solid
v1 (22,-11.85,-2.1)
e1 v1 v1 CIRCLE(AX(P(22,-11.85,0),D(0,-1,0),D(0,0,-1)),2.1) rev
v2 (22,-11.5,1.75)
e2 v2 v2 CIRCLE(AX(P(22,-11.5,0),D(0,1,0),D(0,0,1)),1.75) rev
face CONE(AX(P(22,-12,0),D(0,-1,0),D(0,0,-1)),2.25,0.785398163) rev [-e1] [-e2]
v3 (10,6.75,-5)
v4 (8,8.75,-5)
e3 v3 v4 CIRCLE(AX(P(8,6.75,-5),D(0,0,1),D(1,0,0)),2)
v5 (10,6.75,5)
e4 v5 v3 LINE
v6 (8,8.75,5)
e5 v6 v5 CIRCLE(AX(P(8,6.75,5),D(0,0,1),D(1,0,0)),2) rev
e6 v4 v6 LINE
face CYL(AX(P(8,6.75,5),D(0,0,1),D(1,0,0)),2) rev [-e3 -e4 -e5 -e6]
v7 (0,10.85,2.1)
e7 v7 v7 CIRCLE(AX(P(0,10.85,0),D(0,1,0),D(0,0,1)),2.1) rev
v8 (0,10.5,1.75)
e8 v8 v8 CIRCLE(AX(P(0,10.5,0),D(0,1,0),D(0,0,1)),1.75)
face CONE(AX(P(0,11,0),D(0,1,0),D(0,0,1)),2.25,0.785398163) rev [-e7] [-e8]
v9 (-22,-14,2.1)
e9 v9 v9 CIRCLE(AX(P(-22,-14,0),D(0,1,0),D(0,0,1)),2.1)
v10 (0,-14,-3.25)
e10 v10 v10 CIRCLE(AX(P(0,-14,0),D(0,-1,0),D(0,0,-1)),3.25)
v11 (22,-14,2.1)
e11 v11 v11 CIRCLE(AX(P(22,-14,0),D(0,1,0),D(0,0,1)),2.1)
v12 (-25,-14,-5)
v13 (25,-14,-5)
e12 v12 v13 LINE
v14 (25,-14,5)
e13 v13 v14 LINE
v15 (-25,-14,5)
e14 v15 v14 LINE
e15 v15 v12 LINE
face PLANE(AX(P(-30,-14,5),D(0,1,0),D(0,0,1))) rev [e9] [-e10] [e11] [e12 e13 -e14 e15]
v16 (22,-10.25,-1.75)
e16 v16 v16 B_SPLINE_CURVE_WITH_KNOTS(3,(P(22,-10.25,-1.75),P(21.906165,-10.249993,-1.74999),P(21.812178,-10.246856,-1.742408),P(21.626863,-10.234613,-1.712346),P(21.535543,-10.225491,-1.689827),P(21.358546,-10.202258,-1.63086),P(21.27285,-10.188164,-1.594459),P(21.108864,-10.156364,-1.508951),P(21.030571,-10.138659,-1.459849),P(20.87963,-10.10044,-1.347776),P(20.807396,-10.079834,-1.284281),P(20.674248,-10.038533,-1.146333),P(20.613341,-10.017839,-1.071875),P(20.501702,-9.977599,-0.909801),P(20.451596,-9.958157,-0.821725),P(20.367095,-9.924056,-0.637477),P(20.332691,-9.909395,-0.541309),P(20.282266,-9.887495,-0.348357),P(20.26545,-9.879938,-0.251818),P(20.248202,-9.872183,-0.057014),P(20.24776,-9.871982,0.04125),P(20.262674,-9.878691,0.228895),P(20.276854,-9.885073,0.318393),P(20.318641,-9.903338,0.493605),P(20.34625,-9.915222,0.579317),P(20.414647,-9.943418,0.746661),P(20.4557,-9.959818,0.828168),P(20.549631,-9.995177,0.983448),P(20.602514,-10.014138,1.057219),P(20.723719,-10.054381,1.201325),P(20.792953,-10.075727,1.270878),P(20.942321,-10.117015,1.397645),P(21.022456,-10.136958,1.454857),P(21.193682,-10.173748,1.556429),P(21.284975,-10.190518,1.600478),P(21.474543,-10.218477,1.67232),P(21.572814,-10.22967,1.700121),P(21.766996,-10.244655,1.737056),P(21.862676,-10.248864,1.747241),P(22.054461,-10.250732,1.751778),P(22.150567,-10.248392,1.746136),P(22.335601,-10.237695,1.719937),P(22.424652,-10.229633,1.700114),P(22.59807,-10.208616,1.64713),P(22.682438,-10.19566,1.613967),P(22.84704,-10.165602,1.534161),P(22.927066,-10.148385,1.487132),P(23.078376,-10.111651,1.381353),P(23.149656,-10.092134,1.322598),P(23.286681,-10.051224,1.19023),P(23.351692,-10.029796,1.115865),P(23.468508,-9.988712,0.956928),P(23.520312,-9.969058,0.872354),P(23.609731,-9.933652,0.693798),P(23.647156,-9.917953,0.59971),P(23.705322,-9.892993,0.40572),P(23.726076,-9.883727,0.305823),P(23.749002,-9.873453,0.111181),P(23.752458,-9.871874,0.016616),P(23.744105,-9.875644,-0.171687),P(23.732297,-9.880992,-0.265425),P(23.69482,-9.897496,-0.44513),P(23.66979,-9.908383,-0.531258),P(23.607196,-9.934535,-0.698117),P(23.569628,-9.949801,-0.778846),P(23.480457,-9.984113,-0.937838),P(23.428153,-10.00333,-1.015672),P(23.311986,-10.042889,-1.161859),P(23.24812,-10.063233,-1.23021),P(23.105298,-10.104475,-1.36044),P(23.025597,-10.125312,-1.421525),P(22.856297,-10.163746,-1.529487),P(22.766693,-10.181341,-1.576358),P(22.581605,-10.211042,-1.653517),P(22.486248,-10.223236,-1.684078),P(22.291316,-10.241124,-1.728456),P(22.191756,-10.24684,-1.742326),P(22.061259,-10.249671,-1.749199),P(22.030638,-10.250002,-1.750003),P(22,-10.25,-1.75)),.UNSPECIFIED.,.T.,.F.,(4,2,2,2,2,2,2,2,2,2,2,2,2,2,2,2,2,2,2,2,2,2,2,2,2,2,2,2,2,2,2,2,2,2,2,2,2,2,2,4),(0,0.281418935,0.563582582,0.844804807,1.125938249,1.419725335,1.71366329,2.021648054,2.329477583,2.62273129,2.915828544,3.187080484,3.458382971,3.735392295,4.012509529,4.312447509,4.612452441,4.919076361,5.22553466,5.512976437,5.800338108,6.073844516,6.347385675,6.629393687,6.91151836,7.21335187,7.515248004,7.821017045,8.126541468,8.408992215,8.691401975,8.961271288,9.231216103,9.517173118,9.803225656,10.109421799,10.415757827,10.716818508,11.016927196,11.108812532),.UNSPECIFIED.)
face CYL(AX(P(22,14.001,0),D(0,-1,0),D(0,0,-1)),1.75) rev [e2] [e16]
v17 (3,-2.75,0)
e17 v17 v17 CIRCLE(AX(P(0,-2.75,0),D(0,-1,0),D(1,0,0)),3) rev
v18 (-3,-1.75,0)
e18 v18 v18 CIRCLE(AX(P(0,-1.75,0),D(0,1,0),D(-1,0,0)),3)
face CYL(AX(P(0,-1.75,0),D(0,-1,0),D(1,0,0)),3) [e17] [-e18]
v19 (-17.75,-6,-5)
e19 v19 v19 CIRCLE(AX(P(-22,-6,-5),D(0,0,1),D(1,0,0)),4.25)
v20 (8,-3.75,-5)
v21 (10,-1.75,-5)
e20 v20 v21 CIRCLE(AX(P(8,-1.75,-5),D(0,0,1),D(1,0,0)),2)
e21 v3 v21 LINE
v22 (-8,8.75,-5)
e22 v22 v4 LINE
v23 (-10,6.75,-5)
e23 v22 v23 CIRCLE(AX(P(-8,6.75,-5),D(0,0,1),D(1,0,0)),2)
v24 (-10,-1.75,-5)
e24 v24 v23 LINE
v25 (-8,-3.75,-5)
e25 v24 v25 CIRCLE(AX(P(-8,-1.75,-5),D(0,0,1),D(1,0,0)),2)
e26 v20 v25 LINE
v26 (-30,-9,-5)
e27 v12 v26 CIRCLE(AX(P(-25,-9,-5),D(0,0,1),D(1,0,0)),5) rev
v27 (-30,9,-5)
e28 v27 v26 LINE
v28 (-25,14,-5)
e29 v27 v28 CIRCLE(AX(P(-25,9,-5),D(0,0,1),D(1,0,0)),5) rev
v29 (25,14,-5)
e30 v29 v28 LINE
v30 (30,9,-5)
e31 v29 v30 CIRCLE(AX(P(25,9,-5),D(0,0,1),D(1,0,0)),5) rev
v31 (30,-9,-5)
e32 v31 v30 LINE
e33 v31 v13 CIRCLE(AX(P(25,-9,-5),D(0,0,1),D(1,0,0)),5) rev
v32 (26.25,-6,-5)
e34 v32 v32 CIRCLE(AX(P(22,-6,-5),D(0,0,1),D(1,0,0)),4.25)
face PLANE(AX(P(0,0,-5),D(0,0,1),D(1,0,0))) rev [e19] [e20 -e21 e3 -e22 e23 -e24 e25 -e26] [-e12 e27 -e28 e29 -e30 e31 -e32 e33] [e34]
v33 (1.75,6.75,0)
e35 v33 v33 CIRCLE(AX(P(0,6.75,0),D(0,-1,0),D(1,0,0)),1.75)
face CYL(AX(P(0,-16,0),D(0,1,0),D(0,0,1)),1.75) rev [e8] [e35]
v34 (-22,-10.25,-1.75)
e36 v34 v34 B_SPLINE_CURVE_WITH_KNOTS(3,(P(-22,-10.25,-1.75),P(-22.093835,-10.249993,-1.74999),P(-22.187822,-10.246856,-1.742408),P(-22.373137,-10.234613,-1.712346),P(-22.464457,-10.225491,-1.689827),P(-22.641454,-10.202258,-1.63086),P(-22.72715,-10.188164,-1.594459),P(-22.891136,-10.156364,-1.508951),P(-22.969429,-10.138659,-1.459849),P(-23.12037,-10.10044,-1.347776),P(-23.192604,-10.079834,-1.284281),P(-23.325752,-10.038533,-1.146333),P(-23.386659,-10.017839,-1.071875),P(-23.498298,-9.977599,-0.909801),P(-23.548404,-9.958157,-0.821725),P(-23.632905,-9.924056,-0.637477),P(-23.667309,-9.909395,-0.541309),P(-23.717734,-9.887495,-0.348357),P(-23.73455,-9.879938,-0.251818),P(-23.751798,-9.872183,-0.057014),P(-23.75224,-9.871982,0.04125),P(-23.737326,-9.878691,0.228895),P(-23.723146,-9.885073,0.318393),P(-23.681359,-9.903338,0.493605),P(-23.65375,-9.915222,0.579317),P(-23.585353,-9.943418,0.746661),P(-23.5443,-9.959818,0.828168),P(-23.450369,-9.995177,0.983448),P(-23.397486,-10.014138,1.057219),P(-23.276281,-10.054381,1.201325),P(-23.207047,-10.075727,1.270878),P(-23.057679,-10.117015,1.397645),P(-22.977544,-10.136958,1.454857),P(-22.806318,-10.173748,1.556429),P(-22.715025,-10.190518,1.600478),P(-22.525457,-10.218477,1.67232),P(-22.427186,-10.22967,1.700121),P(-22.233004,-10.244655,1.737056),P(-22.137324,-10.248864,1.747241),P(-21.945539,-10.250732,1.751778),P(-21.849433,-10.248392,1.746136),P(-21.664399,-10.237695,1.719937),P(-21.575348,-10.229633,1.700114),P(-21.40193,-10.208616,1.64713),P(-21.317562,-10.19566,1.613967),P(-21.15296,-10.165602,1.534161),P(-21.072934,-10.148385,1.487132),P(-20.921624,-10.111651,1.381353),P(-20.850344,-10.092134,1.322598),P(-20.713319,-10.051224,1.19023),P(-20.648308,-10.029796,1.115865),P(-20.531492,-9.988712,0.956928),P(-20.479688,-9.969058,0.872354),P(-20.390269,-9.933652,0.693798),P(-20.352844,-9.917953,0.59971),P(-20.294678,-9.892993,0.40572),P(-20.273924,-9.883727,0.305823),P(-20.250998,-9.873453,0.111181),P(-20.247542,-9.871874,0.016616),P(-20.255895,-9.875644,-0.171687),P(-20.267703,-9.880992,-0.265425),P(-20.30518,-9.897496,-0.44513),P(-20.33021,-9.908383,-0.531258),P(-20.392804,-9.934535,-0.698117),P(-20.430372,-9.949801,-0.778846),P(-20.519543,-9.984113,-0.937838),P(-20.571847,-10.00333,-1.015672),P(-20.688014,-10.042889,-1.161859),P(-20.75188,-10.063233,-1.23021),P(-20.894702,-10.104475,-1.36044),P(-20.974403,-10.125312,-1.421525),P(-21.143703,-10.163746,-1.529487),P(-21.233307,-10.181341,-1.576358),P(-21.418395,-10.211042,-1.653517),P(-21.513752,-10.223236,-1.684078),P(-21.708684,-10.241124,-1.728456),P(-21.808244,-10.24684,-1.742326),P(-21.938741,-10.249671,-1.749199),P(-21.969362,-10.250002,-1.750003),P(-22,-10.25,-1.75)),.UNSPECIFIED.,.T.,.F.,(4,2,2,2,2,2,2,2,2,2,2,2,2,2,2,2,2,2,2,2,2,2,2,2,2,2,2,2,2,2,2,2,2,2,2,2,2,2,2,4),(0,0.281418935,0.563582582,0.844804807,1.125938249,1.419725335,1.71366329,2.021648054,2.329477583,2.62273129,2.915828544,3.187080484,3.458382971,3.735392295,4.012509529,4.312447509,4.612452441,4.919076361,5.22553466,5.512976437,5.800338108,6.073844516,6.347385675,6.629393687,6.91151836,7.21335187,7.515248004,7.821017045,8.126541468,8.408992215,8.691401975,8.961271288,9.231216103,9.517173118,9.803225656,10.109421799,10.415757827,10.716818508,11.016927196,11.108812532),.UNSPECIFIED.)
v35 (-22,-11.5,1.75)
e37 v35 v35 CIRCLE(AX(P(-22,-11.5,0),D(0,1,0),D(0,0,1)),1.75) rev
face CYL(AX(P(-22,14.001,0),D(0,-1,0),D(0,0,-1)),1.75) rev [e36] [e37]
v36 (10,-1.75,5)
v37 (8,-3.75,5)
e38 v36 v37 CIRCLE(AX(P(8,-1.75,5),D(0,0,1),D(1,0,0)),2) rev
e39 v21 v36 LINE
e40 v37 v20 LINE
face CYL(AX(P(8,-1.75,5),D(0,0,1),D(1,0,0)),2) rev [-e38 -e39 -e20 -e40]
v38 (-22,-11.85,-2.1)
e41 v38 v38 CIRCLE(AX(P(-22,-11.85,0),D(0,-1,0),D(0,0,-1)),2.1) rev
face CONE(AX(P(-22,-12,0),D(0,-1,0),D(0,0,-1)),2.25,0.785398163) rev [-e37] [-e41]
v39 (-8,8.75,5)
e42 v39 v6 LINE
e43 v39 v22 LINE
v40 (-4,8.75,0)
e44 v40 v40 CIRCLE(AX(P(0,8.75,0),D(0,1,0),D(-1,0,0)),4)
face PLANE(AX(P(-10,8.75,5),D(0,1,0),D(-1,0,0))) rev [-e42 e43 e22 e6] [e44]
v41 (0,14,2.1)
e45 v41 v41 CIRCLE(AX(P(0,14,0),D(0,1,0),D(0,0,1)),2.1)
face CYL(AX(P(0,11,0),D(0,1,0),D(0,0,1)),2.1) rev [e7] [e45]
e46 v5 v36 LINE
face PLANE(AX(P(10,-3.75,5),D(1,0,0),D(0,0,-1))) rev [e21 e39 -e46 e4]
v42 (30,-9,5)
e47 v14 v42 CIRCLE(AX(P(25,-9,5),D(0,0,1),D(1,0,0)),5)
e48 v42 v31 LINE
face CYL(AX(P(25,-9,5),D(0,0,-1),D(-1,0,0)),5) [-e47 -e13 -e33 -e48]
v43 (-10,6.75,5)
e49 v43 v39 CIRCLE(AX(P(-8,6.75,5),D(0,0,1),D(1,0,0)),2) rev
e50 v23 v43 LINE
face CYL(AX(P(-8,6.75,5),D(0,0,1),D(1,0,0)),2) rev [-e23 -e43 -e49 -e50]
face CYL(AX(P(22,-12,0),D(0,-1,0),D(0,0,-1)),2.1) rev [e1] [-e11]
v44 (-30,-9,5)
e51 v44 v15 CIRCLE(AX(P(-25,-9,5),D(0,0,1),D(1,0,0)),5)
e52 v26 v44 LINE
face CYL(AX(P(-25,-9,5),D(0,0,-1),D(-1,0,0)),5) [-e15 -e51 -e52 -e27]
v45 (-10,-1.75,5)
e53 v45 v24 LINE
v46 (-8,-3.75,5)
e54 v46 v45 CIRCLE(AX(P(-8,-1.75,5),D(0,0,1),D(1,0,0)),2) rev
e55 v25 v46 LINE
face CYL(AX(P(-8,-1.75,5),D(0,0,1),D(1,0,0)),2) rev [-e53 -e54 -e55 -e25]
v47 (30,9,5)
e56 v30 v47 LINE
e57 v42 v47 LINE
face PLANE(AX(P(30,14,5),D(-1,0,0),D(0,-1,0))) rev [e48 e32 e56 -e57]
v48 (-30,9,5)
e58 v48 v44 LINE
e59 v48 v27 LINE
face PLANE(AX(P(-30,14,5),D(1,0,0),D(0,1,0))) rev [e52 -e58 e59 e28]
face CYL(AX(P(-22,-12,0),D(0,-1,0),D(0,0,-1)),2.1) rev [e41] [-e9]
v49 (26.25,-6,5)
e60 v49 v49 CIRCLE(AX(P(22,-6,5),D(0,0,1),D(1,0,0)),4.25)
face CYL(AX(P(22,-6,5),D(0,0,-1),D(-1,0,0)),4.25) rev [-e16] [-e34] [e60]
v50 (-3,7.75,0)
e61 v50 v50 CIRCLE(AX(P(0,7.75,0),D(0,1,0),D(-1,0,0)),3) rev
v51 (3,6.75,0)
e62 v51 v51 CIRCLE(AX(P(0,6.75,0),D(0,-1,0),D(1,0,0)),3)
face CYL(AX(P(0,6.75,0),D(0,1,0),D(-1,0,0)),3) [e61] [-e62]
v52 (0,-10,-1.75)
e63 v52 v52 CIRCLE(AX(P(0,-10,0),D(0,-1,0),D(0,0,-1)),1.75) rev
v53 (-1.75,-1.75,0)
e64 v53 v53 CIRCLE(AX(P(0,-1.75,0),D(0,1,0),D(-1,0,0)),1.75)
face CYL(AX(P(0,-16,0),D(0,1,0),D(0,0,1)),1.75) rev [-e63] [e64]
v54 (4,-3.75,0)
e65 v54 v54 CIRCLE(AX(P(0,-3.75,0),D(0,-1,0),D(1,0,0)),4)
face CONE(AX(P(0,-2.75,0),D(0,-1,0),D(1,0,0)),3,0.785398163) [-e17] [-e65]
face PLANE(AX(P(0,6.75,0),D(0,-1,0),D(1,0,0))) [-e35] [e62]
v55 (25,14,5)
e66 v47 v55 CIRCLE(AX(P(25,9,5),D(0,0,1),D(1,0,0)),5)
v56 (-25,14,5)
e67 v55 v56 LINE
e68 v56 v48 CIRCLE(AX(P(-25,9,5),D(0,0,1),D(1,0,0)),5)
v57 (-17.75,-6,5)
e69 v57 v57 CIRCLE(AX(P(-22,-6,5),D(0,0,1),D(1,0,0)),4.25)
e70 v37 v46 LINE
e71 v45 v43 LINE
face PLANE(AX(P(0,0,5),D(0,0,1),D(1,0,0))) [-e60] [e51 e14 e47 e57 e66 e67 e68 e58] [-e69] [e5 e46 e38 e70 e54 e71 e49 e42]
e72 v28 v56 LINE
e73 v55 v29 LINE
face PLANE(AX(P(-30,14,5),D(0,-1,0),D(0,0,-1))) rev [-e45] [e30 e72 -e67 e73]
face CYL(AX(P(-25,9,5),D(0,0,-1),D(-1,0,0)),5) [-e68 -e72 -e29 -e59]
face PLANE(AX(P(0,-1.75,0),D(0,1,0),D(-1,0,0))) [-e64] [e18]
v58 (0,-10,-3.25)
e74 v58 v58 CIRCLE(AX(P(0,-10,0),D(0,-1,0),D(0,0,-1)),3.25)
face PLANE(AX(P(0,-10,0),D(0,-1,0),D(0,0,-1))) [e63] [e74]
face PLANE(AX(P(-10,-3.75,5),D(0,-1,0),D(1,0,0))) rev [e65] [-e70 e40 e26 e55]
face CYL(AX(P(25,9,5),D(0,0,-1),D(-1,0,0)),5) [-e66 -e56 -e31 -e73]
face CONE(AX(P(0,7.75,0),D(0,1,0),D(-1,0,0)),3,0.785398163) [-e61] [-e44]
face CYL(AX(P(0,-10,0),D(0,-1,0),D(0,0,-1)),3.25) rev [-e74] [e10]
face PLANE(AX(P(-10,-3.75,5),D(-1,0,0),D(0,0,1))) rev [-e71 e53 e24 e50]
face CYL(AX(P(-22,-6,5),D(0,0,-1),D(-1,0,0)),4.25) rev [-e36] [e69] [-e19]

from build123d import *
from build123d.topology import SkipClean

# Parameters (mm, degrees)
SKETCH1_W           = 60
SKETCH1_H           = 28
SKETCH1_R           = 4.25
BOSS_EXTRUDE1_DEPTH = 5
SKETCH2_W           = 20
SKETCH2_H           = 12.5
CUT_EXTRUDE1_DEPTH  = 35.583232932
SKETCH3_R           = 1.75
CUT_EXTRUDE2_DEPTH  = 30
CUT_EXTRUDE3_REACH  = 43.34
SKETCH4_R           = 1.75
FILLET1_R           = 5
FILLET2_R           = 2
SKETCH5_R           = 3.25
CUT_EXTRUDE4_DEPTH  = 4
SKETCH6_R           = 2.1
CUT_EXTRUDE5_DEPTH  = 2
SKETCH7_R           = 3
SKETCH7_R_2         = 1.75
BOSS_EXTRUDE2_DEPTH = 2
BOSS_EXTRUDE3_START = 2
SKETCH8_R           = 3
SKETCH8_R_2         = 1.75
BOSS_EXTRUDE3_DEPTH = 2
SKETCH9_R           = 2.1
CUT_EXTRUDE6_DEPTH  = 3
CHAMFER1_SIZE       = 0.5
CHAMFER2_SIZE       = 1


with BuildPart() as part:
    # Sketch1 → Boss-Extrude1 (new, symmetric)
    with BuildSketch(Plane.XY):
        Rectangle(SKETCH1_W, SKETCH1_H)
        with Locations((-22, -6)):
            Circle(SKETCH1_R, mode=Mode.SUBTRACT)
        with Locations((22, -6)):
            Circle(SKETCH1_R, mode=Mode.SUBTRACT)
    extrude(amount=BOSS_EXTRUDE1_DEPTH, both=True)

    # Sketch2 → Cut-Extrude1 (cut, through all)
    with BuildSketch(Plane(origin=(0, 0, -5), x_dir=(-1, 0, 0), z_dir=(0, 0, -1))):
        with Locations((0, 2.5)):
            Rectangle(SKETCH2_W, SKETCH2_H)
    extrude(amount=-CUT_EXTRUDE1_DEPTH, mode=Mode.SUBTRACT)

    # Sketch3 → Cut-Extrude2 (cut)
    with BuildSketch(Plane(origin=(0, 14, 0), x_dir=(1, 0, 0), z_dir=(0, 1, 0))):
        with Locations(Location((0, 0, 0), (0, 0, 270))):
            Circle(SKETCH3_R)
    extrude(amount=-CUT_EXTRUDE2_DEPTH, mode=Mode.SUBTRACT)

    # Sketch4 → Cut-Extrude3 (cut, up to next)
    with BuildSketch(Plane(origin=(0, -14, 0), x_dir=(1, 0, 0), z_dir=(0, 1, 0)), mode=Mode.PRIVATE) as cut_extrude3_sk1:
        with Locations(Location((-22, 0, 0), (0, 0, 90))):
            Circle(SKETCH4_R)
    cut_extrude3_tool1 = extrude(cut_extrude3_sk1.sketch, amount=CUT_EXTRUDE3_REACH, mode=Mode.PRIVATE) & part.part
    # Sketch4 → Cut-Extrude3 (cut, up to next)
    with BuildSketch(Plane(origin=(0, -14, 0), x_dir=(1, 0, 0), z_dir=(0, 1, 0)), mode=Mode.PRIVATE) as cut_extrude3_sk2:
        with Locations(Location((22, 0, 0), (0, 0, 90))):
            Circle(SKETCH4_R)
    cut_extrude3_tool2 = extrude(cut_extrude3_sk2.sketch, amount=CUT_EXTRUDE3_REACH, mode=Mode.PRIVATE) & part.part
    add(cut_extrude3_tool1.solids().sort_by_distance((-22, -14, 0))[0], mode=Mode.SUBTRACT)
    add(cut_extrude3_tool2.solids().sort_by_distance((22, -14, 0))[0], mode=Mode.SUBTRACT)

    # Fillet1
    fillet1_edges = [part.edges().sort_by_distance(p)[0] for p in [
        (-30, 14, 0),
        (30, 14, 0),
        (30, -14, 0),
        (-30, -14, 0),
    ]]
    fillet(fillet1_edges, radius=FILLET1_R)

    # Fillet2
    fillet2_edges = [part.edges().sort_by_distance(p)[0] for p in [
        (-10, 8.75, 0),
        (-10, -3.75, 0),
        (10, -3.75, 0),
        (10, 8.75, 0),
    ]]
    fillet(fillet2_edges, radius=FILLET2_R)

    # Sketch5 → Cut-Extrude4 (cut)
    with BuildSketch(Plane.XZ.offset(14)):
        with Locations(Location((0, 0, 0), (0, 0, 270))):
            Circle(SKETCH5_R)
    extrude(amount=-CUT_EXTRUDE4_DEPTH, mode=Mode.SUBTRACT)

    # Sketch6 → Cut-Extrude5 (cut)
    with BuildSketch(Plane(origin=(0, -14, 0), x_dir=(1, 0, 0), z_dir=(0, 1, 0))):
        with Locations(Location((-22, 0, 0), (0, 0, 270))):
            Circle(SKETCH6_R)
        with Locations(Location((22, 0, 0), (0, 0, 270))):
            Circle(SKETCH6_R)
    extrude(amount=CUT_EXTRUDE5_DEPTH, mode=Mode.SUBTRACT)

    # Sketch7 → Boss-Extrude2 (add)
    with SkipClean():  # the faces are left unmerged after this step: merging them gives an invalid solid
        with BuildSketch(Plane.XZ.offset(-8.75)):
            with Locations(Location((0, 0, 0), (0, 0, 180))):
                Circle(SKETCH7_R)
            Circle(SKETCH7_R_2, mode=Mode.SUBTRACT)
        extrude(amount=BOSS_EXTRUDE2_DEPTH)

    # Sketch8 → Boss-Extrude3 (add)
    with SkipClean():  # the faces are left unmerged after this step: merging them gives an invalid solid
        with BuildSketch(Plane(origin=(0, -3.75, 0), x_dir=(1, 0, 0), z_dir=(0, 1, 0)).offset(BOSS_EXTRUDE3_START)):
            with Locations(Location((0, 0, 0), (0, 0, 180))):
                Circle(SKETCH8_R)
            with Locations(Location((0, 0, 0), (0, 0, 180))):
                Circle(SKETCH8_R_2, mode=Mode.SUBTRACT)
        extrude(amount=-BOSS_EXTRUDE3_DEPTH)

    # Sketch9 → Cut-Extrude6 (cut)
    with SkipClean():  # the faces are left unmerged after this step: merging them gives an invalid solid
        with BuildSketch(Plane(origin=(0, 14, 0), x_dir=(1, 0, 0), z_dir=(0, 1, 0))):
            with Locations(Location((0, 0, 0), (0, 0, 270))):
                Circle(SKETCH9_R)
        extrude(amount=-CUT_EXTRUDE6_DEPTH, mode=Mode.SUBTRACT)

    # Chamfer1
    # the kernel refuses this chamfer: 0.5 mm, written as the material it takes off along each edge
    with BuildSketch(Plane(origin=(22, -12, 0), x_dir=(0, 0, -1), z_dir=(-1, 0, 0))) as chamfer1_piece_1_section:
        Polygon((1.75, -CHAMFER1_SIZE), (1.75 + CHAMFER1_SIZE, 0), (1.75, 0), align=None)
    chamfer1_piece_1 = revolve(axis=Axis((22, -12, 0), (0, -1, 0)), mode=Mode.PRIVATE)
    chamfer1_piece_1 = chamfer1_piece_1 & Plane(origin=(22, -11.675956313, 0), x_dir=(0, 0, 1), z_dir=(0, -1, 0)) * Cylinder(2.1, 9, mode=Mode.PRIVATE)
    add(chamfer1_piece_1, mode=Mode.SUBTRACT)
    with BuildSketch(Plane(origin=(-22, -12, 0), x_dir=(0, 0, -1), z_dir=(-1, 0, 0))) as chamfer1_piece_2_section:
        Polygon((1.75, -CHAMFER1_SIZE), (1.75 + CHAMFER1_SIZE, 0), (1.75, 0), align=None)
    chamfer1_piece_2 = revolve(axis=Axis((-22, -12, 0), (0, -1, 0)), mode=Mode.PRIVATE)
    chamfer1_piece_2 = chamfer1_piece_2 & Plane(origin=(-22, -11.675956313, 0), x_dir=(0, 0, 1), z_dir=(0, -1, 0)) * Cylinder(2.1, 9, mode=Mode.PRIVATE)
    add(chamfer1_piece_2, mode=Mode.SUBTRACT)
    with BuildSketch(Plane(origin=(0, 11, 0), x_dir=(0, 0, 1), z_dir=(-1, 0, 0))) as chamfer1_piece_3_section:
        Polygon((1.75 + CHAMFER1_SIZE, 0), (1.75, -CHAMFER1_SIZE), (1.75, 0), align=None)
    chamfer1_piece_3 = revolve(axis=Axis((0, 11, 0), (0, 1, 0)), mode=Mode.PRIVATE)
    chamfer1_piece_3 = chamfer1_piece_3 & Plane(origin=(0, 10.675956313, 0), x_dir=(0, 0, 1), z_dir=(0, 1, 0)) * Cylinder(2.1, 9, mode=Mode.PRIVATE)
    add(chamfer1_piece_3, mode=Mode.SUBTRACT)

    # Chamfer2
    chamfer2_edges = [part.edges().sort_by_distance(p)[0] for p in [
        (3, 8.75, 0),
        (3, -3.75, 0),
    ]]
    chamfer(chamfer2_edges, length=CHAMFER2_SIZE)


solid = part.part
